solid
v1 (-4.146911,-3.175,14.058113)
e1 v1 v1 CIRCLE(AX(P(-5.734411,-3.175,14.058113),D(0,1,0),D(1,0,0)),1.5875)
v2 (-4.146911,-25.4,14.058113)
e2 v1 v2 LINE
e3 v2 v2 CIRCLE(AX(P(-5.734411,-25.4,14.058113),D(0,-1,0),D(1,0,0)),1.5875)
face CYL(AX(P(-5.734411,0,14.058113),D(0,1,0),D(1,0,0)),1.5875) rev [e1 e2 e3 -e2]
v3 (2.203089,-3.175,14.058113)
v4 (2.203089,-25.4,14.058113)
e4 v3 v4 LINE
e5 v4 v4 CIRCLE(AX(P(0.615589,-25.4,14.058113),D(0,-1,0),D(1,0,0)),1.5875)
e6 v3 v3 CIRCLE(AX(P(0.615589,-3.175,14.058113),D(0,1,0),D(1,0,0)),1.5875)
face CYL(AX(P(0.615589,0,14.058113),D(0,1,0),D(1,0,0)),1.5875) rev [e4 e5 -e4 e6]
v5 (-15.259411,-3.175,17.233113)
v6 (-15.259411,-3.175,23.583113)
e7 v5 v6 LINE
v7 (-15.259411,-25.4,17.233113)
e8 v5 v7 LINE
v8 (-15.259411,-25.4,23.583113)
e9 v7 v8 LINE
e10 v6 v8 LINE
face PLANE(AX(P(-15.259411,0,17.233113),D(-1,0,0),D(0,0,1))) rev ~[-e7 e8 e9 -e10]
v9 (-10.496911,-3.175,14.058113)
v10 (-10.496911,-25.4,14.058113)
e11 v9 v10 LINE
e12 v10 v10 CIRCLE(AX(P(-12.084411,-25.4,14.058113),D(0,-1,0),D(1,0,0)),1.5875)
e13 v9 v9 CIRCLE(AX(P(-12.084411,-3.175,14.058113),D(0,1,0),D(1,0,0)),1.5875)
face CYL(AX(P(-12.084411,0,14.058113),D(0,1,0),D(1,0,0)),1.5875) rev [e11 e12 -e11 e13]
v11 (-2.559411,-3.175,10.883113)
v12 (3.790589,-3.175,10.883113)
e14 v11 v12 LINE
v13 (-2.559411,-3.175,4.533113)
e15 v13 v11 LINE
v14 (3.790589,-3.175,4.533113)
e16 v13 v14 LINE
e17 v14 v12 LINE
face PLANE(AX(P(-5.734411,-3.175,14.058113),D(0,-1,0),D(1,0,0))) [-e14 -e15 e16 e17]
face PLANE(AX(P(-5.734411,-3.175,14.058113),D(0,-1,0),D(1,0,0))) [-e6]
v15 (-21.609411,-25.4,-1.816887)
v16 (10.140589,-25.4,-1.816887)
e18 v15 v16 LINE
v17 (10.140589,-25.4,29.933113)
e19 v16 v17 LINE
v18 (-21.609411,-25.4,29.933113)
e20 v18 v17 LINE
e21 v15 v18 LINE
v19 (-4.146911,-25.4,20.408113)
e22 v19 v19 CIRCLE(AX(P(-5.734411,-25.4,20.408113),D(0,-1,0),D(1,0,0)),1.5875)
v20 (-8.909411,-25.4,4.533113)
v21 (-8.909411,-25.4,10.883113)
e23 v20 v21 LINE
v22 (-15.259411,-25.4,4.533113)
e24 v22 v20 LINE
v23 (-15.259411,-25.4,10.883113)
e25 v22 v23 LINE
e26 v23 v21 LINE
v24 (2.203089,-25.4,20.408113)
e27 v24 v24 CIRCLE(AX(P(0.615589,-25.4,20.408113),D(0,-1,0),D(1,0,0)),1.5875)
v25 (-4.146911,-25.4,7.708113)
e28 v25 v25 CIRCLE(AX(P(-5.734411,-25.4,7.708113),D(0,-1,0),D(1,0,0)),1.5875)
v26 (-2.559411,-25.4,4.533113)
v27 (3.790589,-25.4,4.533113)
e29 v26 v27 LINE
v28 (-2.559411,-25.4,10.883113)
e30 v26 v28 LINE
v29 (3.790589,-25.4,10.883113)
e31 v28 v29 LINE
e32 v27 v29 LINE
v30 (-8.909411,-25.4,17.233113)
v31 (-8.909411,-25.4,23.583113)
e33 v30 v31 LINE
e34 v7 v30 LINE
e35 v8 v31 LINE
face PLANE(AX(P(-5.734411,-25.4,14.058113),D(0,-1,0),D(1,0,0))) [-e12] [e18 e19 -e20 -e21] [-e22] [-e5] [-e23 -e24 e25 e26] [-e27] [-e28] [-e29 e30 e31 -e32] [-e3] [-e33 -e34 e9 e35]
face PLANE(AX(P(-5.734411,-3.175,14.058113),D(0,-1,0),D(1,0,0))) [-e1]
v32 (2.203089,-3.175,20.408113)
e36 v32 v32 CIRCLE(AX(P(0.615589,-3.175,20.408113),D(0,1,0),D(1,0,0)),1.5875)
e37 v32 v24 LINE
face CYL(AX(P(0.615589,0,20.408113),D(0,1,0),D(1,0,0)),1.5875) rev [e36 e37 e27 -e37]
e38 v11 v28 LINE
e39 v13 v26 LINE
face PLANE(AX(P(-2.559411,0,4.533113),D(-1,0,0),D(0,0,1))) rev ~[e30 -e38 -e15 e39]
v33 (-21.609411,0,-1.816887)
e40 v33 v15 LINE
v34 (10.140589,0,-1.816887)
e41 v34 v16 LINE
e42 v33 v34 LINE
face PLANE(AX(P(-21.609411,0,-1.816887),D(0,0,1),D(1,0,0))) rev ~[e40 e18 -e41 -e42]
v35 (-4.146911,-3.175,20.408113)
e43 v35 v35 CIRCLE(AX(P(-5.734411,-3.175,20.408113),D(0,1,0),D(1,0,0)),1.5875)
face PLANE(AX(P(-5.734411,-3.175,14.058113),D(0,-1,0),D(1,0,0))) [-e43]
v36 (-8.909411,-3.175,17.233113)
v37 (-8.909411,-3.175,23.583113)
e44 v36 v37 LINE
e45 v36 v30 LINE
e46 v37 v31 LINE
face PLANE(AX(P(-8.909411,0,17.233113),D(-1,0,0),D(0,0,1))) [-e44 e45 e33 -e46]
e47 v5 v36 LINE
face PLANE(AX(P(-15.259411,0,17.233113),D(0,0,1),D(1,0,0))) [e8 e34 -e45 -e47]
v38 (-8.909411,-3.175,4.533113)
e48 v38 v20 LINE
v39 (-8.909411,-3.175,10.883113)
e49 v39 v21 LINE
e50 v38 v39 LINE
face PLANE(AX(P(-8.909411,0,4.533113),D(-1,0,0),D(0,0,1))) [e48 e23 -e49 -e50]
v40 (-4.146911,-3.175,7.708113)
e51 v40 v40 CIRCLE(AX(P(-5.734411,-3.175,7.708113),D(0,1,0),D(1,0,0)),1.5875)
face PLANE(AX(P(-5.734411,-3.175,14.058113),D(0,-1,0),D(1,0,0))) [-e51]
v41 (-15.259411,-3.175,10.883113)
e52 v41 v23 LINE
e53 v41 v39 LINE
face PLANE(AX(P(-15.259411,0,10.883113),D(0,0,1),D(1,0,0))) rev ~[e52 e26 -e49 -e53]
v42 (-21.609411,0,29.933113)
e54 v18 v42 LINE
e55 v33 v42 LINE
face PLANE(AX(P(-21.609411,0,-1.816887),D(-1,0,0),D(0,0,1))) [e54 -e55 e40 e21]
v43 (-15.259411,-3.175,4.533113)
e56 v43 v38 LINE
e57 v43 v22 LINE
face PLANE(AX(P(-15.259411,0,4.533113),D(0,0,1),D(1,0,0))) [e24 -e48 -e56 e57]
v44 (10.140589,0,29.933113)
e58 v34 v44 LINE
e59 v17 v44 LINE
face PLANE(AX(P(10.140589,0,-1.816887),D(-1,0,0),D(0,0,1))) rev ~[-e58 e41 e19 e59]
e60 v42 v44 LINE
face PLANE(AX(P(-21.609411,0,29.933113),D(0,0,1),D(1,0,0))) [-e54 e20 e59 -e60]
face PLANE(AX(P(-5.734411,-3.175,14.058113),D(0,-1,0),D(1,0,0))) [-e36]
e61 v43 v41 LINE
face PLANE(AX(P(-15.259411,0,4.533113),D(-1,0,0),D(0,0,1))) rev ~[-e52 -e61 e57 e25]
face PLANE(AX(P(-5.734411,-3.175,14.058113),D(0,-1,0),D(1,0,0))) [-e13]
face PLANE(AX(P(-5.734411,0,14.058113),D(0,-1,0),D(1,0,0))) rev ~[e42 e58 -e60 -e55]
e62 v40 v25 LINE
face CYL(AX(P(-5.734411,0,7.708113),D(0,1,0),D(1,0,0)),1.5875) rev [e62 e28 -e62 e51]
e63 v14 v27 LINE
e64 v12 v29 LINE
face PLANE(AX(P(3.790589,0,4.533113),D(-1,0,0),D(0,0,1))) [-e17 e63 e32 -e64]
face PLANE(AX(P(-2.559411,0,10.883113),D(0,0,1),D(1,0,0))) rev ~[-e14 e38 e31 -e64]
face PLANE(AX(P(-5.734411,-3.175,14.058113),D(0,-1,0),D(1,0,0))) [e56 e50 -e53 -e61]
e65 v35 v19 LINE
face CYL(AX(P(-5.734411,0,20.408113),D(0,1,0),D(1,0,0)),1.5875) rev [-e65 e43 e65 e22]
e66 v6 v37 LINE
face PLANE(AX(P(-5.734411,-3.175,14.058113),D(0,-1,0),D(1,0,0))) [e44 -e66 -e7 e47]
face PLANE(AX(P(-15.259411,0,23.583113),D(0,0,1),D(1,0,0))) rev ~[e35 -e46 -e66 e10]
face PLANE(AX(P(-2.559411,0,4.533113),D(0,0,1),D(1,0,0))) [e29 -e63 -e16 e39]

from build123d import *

# Parameters (mm, degrees)
F0_W     = 31.75
F0_H     = 31.75
F0_W_2   = 6.35
F0_H_2   = 6.35
F0_R     = 1.5875
F1_DEPTH = 25.4
F2_DEPTH = 3.175


# Not quite as in the source:
# - a length typed as a fraction of an inch, garbled in the dataset ("3 / 203.2 mm" for 3/8 in), is restored


with BuildPart() as f1:
    # F0 (on Front) → F1 (new body)
    with BuildSketch(Plane.XZ):
        with Locations((-5.7344107546, 14.0581134118)):
            Rectangle(F0_W, F0_H)
        with Locations((-12.0844107546, 7.7081134118)):
            Rectangle(F0_W_2, F0_H_2, mode=Mode.SUBTRACT)
        with Locations((-12.0844107546, 14.0581134118)):
            Circle(F0_R, mode=Mode.SUBTRACT)
        with Locations((-5.7344107546, 7.7081134118)):
            Circle(F0_R, mode=Mode.SUBTRACT)
        with Locations((0.6155892454, 7.7081134118)):
            Rectangle(F0_W_2, F0_H_2, mode=Mode.SUBTRACT)
        with Locations((-5.7344107546, 14.0581134118)):
            Circle(F0_R, mode=Mode.SUBTRACT)
        with Locations((0.6155892454, 14.0581134118)):
            Circle(F0_R, mode=Mode.SUBTRACT)
        with Locations((-12.0844107546, 20.4081134118)):
            Rectangle(F0_W_2, F0_H_2, mode=Mode.SUBTRACT)
        with Locations((-5.7344107546, 20.4081134118)):
            Circle(F0_R, mode=Mode.SUBTRACT)
        with Locations((0.6155892454, 20.4081134118)):
            Circle(F0_R, mode=Mode.SUBTRACT)
    extrude(amount=F1_DEPTH)

    # F0 (on Front) → F2 (join)
    with BuildSketch(Plane.XZ):
        with Locations((-5.7344107546, 14.0581134118)):
            Rectangle(F0_W, F0_H)
        with Locations((-12.0844107546, 7.7081134118)):
            Rectangle(F0_W_2, F0_H_2, mode=Mode.SUBTRACT)
        with Locations((-12.0844107546, 14.0581134118)):
            Circle(F0_R, mode=Mode.SUBTRACT)
        with Locations((-5.7344107546, 7.7081134118)):
            Circle(F0_R, mode=Mode.SUBTRACT)
        with Locations((0.6155892454, 7.7081134118)):
            Rectangle(F0_W_2, F0_H_2, mode=Mode.SUBTRACT)
        with Locations((-5.7344107546, 14.0581134118)):
            Circle(F0_R, mode=Mode.SUBTRACT)
        with Locations((0.6155892454, 14.0581134118)):
            Circle(F0_R, mode=Mode.SUBTRACT)
        with Locations((-12.0844107546, 20.4081134118)):
            Rectangle(F0_W_2, F0_H_2, mode=Mode.SUBTRACT)
        with Locations((-5.7344107546, 20.4081134118)):
            Circle(F0_R, mode=Mode.SUBTRACT)
        with Locations((0.6155892454, 20.4081134118)):
            Circle(F0_R, mode=Mode.SUBTRACT)
        with Locations((-12.0844107546, 7.7081134118)):
            Rectangle(F0_W_2, F0_H_2)
        with Locations((-5.7344107546, 7.7081134118)):
            Circle(F0_R)
        with Locations((0.6155892454, 7.7081134118)):
            Rectangle(F0_W_2, F0_H_2)
        with Locations((0.6155892454, 14.0581134118)):
            Circle(F0_R)
        with Locations((-5.7344107546, 14.0581134118)):
            Circle(F0_R)
        with Locations((-12.0844107546, 14.0581134118)):
            Circle(F0_R)
        with Locations((-12.0844107546, 20.4081134118)):
            Rectangle(F0_W_2, F0_H_2)
        with Locations((-5.7344107546, 20.4081134118)):
            Circle(F0_R)
        with Locations((0.6155892454, 20.4081134118)):
            Circle(F0_R)
    extrude(amount=F2_DEPTH)


solid = f1.part
